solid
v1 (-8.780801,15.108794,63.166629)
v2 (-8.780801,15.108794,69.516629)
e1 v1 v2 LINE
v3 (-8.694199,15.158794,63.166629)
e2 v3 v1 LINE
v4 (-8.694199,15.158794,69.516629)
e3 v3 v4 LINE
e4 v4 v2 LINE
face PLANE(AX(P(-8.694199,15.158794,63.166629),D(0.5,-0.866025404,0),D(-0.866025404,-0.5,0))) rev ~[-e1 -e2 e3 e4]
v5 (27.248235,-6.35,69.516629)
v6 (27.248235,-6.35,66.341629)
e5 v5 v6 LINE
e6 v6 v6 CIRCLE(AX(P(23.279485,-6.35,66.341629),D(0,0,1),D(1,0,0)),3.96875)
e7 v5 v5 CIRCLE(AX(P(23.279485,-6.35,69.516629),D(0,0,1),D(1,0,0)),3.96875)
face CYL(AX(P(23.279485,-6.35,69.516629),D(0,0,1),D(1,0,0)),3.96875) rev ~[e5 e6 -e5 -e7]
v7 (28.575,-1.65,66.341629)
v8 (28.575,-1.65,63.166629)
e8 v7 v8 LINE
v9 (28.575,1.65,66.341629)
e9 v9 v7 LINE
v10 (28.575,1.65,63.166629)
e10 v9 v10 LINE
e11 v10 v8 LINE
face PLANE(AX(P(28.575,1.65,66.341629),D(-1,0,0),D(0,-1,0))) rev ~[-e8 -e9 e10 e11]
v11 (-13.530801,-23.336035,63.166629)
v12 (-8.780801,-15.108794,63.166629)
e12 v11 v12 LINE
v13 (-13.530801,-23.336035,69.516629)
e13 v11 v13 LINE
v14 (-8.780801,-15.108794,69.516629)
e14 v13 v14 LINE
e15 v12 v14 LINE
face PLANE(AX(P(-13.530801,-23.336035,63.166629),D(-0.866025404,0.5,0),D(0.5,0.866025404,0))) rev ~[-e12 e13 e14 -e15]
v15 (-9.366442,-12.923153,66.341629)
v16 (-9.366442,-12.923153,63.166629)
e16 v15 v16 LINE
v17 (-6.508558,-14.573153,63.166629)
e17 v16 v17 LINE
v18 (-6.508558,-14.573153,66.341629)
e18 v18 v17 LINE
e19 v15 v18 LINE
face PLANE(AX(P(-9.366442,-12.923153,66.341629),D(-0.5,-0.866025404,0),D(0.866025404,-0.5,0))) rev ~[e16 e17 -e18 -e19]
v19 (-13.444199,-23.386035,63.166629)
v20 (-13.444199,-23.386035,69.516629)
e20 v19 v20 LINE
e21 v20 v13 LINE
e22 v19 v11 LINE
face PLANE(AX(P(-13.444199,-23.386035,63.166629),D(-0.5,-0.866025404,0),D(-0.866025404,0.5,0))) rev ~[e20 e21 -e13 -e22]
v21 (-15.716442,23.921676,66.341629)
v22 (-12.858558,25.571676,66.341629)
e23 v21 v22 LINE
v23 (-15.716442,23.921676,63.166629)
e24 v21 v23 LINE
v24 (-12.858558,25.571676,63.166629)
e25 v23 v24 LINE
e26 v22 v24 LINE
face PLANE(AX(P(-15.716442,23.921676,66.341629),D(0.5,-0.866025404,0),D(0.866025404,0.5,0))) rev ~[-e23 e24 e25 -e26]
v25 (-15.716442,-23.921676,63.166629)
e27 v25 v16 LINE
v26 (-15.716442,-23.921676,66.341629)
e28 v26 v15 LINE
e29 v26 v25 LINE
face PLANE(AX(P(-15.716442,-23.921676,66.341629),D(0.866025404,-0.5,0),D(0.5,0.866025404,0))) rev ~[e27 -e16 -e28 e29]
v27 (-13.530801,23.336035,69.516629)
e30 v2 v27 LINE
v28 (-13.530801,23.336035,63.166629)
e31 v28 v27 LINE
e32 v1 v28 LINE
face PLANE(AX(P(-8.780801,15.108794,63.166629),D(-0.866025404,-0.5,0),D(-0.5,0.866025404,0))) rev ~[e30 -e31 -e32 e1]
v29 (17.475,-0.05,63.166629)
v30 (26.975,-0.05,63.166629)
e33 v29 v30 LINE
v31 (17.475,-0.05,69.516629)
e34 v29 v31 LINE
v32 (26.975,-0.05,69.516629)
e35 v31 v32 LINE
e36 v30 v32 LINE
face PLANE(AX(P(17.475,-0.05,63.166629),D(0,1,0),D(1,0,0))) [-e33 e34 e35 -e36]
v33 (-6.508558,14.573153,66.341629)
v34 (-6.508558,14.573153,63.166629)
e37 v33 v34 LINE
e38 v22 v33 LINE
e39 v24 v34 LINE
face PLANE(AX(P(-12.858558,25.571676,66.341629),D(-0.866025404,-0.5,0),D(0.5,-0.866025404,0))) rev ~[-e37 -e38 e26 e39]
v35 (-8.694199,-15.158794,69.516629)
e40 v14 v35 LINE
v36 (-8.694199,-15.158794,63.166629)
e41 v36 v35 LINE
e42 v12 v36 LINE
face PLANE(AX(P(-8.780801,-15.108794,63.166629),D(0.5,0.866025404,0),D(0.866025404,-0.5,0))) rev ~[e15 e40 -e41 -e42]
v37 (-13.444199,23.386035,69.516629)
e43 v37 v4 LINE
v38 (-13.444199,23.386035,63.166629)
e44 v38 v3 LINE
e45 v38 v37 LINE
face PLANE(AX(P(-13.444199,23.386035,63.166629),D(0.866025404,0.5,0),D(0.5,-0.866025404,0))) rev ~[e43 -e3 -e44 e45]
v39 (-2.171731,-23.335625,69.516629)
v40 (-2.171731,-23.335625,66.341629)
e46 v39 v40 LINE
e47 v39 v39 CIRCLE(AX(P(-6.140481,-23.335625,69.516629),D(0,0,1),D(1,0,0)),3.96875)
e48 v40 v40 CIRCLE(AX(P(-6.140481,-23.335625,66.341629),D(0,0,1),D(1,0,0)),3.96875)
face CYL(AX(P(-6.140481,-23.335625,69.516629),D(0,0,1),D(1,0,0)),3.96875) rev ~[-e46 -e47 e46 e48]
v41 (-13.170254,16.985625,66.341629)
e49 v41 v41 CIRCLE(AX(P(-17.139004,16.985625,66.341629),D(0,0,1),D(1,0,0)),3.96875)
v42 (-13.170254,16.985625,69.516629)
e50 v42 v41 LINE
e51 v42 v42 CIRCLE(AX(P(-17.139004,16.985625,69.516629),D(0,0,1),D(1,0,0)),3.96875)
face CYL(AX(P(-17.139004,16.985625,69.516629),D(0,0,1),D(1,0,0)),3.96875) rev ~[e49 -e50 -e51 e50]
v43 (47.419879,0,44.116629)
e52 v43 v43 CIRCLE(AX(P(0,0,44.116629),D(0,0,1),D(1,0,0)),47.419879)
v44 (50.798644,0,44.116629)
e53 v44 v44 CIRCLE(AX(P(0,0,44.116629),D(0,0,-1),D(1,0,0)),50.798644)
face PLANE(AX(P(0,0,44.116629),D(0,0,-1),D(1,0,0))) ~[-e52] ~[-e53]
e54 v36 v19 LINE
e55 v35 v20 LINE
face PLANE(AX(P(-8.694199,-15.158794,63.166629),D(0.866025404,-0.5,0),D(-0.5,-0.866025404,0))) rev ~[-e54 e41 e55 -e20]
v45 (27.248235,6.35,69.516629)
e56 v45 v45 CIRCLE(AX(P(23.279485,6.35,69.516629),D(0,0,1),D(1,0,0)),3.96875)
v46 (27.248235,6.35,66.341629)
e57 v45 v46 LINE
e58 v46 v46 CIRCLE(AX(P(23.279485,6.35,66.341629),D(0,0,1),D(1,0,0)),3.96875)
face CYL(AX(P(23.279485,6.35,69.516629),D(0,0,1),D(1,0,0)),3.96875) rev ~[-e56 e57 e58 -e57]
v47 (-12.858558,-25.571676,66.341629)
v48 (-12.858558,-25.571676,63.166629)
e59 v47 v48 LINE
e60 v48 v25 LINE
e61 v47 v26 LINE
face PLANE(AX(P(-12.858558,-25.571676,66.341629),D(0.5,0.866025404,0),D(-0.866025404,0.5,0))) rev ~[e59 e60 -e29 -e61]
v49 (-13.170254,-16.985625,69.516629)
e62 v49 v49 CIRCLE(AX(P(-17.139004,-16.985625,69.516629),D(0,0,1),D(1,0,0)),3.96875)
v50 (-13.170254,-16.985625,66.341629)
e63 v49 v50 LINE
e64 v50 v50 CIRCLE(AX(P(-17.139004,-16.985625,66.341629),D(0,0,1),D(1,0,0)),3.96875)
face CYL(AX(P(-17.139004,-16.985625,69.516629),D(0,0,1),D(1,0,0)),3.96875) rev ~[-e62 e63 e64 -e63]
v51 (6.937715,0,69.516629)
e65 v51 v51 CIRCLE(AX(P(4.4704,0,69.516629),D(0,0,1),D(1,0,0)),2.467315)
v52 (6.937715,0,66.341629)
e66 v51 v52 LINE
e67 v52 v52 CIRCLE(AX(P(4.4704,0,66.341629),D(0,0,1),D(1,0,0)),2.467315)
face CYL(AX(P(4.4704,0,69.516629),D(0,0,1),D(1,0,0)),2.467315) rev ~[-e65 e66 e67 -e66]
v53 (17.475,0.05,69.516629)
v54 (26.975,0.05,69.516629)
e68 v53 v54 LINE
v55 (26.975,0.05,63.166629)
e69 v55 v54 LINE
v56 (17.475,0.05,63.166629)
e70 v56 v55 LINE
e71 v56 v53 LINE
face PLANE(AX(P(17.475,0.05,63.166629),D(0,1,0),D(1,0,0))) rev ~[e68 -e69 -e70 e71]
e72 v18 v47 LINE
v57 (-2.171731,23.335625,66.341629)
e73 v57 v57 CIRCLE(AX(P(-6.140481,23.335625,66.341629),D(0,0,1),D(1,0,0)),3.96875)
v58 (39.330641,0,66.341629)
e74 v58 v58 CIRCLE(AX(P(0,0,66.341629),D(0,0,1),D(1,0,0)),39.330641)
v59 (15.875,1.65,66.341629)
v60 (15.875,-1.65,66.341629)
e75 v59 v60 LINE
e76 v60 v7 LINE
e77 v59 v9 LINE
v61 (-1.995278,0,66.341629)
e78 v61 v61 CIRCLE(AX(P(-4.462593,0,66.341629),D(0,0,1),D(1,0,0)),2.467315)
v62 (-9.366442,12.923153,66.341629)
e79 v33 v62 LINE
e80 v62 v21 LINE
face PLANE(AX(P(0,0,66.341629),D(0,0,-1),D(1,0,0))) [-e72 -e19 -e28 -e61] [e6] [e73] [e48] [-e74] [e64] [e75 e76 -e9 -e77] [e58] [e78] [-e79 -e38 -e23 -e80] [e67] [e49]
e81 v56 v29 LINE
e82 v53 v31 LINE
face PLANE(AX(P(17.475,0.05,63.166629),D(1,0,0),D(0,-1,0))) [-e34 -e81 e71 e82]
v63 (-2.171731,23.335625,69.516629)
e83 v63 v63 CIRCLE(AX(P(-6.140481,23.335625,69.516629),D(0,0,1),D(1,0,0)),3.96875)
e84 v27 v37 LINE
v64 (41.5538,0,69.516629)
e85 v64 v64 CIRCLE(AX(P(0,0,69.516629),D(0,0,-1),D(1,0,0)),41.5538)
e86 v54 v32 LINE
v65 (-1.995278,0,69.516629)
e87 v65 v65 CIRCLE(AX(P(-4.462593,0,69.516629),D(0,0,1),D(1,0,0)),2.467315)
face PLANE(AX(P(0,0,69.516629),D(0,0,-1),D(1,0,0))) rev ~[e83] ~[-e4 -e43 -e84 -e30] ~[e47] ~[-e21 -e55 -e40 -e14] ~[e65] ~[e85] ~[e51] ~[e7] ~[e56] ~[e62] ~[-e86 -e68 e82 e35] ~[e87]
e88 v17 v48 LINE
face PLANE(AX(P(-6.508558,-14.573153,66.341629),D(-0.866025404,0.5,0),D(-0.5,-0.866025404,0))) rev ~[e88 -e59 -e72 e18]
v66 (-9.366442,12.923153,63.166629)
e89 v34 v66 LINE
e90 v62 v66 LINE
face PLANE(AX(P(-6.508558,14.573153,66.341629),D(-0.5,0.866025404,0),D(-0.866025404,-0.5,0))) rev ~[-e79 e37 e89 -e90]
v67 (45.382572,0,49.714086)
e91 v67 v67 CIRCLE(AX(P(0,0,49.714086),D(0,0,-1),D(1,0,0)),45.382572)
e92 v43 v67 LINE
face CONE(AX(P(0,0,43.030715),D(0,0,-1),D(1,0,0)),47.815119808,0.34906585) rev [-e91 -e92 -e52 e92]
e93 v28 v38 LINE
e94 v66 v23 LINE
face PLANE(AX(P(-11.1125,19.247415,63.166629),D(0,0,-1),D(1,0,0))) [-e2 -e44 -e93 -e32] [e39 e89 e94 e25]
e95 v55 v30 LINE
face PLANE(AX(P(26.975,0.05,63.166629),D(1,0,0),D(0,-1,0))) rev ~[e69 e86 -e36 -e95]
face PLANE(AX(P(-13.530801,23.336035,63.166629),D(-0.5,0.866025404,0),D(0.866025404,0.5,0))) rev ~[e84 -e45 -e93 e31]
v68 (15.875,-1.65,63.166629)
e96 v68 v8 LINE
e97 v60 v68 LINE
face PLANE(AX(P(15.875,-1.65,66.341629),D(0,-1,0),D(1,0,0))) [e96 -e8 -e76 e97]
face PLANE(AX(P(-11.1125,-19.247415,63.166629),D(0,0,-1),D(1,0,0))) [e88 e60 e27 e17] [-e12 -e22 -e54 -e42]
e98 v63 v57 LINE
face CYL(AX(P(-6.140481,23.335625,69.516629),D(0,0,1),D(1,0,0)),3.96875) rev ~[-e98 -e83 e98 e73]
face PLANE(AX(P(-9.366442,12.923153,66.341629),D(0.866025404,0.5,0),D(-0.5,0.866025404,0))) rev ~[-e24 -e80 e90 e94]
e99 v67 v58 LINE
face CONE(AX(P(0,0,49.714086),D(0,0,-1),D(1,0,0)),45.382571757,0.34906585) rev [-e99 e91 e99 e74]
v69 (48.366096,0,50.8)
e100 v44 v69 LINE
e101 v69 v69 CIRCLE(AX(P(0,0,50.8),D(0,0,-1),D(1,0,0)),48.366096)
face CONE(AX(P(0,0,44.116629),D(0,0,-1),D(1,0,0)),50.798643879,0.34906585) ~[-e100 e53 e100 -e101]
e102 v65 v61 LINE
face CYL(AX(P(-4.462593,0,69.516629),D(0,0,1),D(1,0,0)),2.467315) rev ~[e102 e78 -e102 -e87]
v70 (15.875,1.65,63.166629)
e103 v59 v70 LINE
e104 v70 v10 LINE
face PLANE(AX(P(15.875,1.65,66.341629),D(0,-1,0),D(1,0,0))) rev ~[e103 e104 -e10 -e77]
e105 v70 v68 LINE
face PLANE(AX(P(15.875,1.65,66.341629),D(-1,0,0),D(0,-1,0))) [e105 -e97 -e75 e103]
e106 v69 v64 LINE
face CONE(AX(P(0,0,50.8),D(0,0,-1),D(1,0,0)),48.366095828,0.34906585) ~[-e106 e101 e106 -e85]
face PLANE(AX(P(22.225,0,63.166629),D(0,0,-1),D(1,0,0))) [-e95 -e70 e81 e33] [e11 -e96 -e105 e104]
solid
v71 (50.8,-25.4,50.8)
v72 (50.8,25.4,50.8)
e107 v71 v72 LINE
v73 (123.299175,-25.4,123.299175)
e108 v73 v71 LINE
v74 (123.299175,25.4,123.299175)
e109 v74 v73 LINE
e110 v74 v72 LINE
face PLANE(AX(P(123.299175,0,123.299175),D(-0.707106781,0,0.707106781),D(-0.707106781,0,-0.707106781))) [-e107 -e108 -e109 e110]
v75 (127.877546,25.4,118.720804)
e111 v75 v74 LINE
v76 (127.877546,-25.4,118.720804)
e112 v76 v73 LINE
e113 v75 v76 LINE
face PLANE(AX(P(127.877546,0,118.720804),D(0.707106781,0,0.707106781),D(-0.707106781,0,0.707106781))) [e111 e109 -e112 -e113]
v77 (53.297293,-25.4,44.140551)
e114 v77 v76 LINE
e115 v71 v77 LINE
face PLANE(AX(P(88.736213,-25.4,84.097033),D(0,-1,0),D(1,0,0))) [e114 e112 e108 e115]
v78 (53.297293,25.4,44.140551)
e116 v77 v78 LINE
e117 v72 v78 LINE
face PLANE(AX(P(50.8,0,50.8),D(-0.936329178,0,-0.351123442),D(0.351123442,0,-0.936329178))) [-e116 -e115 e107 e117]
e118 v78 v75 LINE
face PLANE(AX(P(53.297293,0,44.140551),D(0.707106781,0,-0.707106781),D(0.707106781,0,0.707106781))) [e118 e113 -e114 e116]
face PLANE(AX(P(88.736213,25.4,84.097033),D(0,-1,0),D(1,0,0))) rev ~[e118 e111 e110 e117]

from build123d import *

# Parameters (mm, degrees)
F3_DEPTH      = 25.4
F3_DEPTH_BACK = 25.4
F4_T          = -3.175
F5_R          = 2.4673149282
F6_DEPTH      = 3.175
F7_R          = 3.96875
F8_DEPTH      = 3.175
F9_W          = 12.7
F9_H          = 3.3
F10_DEPTH     = 3.175
F11_W         = 9.5
F11_H         = 0.1
F12_DEPTH     = 25.4


# Not quite as in the source:
# - a feature names something its author has since deleted; it is built from what else it names


with BuildPart() as f1:
    # F0 (on Front) → F1 (revolve)
    with BuildSketch(Plane.XZ):
        Polygon((48.3660958283, 50.8), (41.5537999286, 69.5166291593), (0, 69.5166291593), (0, 53.5741299391), (0, 44.1166291593), (50.7986438789, 44.1166291593), align=None)
    revolve(axis=Axis((0, 0, 26.7870649695), (0, 0, -1)))

    # F4
    f4_openings = [f1.faces().sort_by_distance(p)[0] for p in [
        (0, 0, 44.116629),
    ]]
    offset(amount=F4_T, openings=f4_openings)

    # F5 (on face) → F6 (cut, through all)
    with BuildSketch(Plane.XY.offset(69.5166291593)):
        with Locations((-4.462592816, 0)):
            Circle(F5_R)
        with Locations((4.4704, 0)):
            Circle(F5_R)
    extrude(amount=-F6_DEPTH, mode=Mode.SUBTRACT)

    # F7 (on face) → F8 (cut, through all)
    with BuildSketch(Plane.XY.offset(69.5166291593)):
        with Locations((-6.1404809512, -23.3356249903)):
            Circle(F7_R)
        with Locations((-17.1390035792, -16.9856249903)):
            Circle(F7_R)
        with Locations((-17.1390035792, 16.9856249903)):
            Circle(F7_R)
        with Locations((-6.1404809512, 23.3356249903)):
            Circle(F7_R)
        with Locations((23.2794845304, 6.35)):
            Circle(F7_R)
        with Locations((23.2794845304, -6.35)):
            Circle(F7_R)
    extrude(amount=-F8_DEPTH, mode=Mode.SUBTRACT)

    # F9 (on face) → F10 (join)
    with BuildSketch(Plane(origin=(0, 0, 66.3416291593), x_dir=(1, 0, 0), z_dir=(0, 0, -1))):
        with Locations((22.225, 0)):
            Rectangle(F9_W, F9_H)
        Polygon((-6.5085580838, 14.5731532851), (-12.8585580838, 25.5716759131), (-15.7164419162, 23.9216759131), (-9.3664419162, 12.9231532851), align=None)
        Polygon((-9.3664419162, -12.9231532851), (-15.7164419162, -23.9216759131), (-12.8585580838, -25.5716759131), (-6.5085580838, -14.5731532851), align=None)
    extrude(amount=F10_DEPTH)

    # F11 (on face) → F12 (cut)
    with BuildSketch(Plane(origin=(0, 0, 63.1666291593), x_dir=(1, 0, 0), z_dir=(0, 0, -1))):
        with Locations((22.225, 0)):
            Rectangle(F11_W, F11_H)
        Polygon((-8.7808012702, -15.1087939311), (-13.5308012702, -23.3360352671), (-13.4441987298, -23.3860352671), (-8.6941987298, -15.1587939311), align=None)
        Polygon((-8.6941987298, 15.1587939311), (-13.4441987298, 23.3860352671), (-13.5308012702, 23.3360352671), (-8.7808012702, 15.1087939311), align=None)
    extrude(amount=-F12_DEPTH, mode=Mode.SUBTRACT)


with BuildPart() as f3:
    # F2 (on Front) → F3 (new body, two sides)
    with BuildSketch(Plane.XZ) as f3_sk:
        Polygon((53.2972933905, 44.1405509586), (127.8775462373, 118.7208038053), (123.2991750213, 123.2991750213), (50.8, 50.8), align=None)
    extrude(amount=F3_DEPTH)
    extrude(f3_sk.sketch, amount=-F3_DEPTH_BACK)


solid = Compound([f1.part, f3.part])
